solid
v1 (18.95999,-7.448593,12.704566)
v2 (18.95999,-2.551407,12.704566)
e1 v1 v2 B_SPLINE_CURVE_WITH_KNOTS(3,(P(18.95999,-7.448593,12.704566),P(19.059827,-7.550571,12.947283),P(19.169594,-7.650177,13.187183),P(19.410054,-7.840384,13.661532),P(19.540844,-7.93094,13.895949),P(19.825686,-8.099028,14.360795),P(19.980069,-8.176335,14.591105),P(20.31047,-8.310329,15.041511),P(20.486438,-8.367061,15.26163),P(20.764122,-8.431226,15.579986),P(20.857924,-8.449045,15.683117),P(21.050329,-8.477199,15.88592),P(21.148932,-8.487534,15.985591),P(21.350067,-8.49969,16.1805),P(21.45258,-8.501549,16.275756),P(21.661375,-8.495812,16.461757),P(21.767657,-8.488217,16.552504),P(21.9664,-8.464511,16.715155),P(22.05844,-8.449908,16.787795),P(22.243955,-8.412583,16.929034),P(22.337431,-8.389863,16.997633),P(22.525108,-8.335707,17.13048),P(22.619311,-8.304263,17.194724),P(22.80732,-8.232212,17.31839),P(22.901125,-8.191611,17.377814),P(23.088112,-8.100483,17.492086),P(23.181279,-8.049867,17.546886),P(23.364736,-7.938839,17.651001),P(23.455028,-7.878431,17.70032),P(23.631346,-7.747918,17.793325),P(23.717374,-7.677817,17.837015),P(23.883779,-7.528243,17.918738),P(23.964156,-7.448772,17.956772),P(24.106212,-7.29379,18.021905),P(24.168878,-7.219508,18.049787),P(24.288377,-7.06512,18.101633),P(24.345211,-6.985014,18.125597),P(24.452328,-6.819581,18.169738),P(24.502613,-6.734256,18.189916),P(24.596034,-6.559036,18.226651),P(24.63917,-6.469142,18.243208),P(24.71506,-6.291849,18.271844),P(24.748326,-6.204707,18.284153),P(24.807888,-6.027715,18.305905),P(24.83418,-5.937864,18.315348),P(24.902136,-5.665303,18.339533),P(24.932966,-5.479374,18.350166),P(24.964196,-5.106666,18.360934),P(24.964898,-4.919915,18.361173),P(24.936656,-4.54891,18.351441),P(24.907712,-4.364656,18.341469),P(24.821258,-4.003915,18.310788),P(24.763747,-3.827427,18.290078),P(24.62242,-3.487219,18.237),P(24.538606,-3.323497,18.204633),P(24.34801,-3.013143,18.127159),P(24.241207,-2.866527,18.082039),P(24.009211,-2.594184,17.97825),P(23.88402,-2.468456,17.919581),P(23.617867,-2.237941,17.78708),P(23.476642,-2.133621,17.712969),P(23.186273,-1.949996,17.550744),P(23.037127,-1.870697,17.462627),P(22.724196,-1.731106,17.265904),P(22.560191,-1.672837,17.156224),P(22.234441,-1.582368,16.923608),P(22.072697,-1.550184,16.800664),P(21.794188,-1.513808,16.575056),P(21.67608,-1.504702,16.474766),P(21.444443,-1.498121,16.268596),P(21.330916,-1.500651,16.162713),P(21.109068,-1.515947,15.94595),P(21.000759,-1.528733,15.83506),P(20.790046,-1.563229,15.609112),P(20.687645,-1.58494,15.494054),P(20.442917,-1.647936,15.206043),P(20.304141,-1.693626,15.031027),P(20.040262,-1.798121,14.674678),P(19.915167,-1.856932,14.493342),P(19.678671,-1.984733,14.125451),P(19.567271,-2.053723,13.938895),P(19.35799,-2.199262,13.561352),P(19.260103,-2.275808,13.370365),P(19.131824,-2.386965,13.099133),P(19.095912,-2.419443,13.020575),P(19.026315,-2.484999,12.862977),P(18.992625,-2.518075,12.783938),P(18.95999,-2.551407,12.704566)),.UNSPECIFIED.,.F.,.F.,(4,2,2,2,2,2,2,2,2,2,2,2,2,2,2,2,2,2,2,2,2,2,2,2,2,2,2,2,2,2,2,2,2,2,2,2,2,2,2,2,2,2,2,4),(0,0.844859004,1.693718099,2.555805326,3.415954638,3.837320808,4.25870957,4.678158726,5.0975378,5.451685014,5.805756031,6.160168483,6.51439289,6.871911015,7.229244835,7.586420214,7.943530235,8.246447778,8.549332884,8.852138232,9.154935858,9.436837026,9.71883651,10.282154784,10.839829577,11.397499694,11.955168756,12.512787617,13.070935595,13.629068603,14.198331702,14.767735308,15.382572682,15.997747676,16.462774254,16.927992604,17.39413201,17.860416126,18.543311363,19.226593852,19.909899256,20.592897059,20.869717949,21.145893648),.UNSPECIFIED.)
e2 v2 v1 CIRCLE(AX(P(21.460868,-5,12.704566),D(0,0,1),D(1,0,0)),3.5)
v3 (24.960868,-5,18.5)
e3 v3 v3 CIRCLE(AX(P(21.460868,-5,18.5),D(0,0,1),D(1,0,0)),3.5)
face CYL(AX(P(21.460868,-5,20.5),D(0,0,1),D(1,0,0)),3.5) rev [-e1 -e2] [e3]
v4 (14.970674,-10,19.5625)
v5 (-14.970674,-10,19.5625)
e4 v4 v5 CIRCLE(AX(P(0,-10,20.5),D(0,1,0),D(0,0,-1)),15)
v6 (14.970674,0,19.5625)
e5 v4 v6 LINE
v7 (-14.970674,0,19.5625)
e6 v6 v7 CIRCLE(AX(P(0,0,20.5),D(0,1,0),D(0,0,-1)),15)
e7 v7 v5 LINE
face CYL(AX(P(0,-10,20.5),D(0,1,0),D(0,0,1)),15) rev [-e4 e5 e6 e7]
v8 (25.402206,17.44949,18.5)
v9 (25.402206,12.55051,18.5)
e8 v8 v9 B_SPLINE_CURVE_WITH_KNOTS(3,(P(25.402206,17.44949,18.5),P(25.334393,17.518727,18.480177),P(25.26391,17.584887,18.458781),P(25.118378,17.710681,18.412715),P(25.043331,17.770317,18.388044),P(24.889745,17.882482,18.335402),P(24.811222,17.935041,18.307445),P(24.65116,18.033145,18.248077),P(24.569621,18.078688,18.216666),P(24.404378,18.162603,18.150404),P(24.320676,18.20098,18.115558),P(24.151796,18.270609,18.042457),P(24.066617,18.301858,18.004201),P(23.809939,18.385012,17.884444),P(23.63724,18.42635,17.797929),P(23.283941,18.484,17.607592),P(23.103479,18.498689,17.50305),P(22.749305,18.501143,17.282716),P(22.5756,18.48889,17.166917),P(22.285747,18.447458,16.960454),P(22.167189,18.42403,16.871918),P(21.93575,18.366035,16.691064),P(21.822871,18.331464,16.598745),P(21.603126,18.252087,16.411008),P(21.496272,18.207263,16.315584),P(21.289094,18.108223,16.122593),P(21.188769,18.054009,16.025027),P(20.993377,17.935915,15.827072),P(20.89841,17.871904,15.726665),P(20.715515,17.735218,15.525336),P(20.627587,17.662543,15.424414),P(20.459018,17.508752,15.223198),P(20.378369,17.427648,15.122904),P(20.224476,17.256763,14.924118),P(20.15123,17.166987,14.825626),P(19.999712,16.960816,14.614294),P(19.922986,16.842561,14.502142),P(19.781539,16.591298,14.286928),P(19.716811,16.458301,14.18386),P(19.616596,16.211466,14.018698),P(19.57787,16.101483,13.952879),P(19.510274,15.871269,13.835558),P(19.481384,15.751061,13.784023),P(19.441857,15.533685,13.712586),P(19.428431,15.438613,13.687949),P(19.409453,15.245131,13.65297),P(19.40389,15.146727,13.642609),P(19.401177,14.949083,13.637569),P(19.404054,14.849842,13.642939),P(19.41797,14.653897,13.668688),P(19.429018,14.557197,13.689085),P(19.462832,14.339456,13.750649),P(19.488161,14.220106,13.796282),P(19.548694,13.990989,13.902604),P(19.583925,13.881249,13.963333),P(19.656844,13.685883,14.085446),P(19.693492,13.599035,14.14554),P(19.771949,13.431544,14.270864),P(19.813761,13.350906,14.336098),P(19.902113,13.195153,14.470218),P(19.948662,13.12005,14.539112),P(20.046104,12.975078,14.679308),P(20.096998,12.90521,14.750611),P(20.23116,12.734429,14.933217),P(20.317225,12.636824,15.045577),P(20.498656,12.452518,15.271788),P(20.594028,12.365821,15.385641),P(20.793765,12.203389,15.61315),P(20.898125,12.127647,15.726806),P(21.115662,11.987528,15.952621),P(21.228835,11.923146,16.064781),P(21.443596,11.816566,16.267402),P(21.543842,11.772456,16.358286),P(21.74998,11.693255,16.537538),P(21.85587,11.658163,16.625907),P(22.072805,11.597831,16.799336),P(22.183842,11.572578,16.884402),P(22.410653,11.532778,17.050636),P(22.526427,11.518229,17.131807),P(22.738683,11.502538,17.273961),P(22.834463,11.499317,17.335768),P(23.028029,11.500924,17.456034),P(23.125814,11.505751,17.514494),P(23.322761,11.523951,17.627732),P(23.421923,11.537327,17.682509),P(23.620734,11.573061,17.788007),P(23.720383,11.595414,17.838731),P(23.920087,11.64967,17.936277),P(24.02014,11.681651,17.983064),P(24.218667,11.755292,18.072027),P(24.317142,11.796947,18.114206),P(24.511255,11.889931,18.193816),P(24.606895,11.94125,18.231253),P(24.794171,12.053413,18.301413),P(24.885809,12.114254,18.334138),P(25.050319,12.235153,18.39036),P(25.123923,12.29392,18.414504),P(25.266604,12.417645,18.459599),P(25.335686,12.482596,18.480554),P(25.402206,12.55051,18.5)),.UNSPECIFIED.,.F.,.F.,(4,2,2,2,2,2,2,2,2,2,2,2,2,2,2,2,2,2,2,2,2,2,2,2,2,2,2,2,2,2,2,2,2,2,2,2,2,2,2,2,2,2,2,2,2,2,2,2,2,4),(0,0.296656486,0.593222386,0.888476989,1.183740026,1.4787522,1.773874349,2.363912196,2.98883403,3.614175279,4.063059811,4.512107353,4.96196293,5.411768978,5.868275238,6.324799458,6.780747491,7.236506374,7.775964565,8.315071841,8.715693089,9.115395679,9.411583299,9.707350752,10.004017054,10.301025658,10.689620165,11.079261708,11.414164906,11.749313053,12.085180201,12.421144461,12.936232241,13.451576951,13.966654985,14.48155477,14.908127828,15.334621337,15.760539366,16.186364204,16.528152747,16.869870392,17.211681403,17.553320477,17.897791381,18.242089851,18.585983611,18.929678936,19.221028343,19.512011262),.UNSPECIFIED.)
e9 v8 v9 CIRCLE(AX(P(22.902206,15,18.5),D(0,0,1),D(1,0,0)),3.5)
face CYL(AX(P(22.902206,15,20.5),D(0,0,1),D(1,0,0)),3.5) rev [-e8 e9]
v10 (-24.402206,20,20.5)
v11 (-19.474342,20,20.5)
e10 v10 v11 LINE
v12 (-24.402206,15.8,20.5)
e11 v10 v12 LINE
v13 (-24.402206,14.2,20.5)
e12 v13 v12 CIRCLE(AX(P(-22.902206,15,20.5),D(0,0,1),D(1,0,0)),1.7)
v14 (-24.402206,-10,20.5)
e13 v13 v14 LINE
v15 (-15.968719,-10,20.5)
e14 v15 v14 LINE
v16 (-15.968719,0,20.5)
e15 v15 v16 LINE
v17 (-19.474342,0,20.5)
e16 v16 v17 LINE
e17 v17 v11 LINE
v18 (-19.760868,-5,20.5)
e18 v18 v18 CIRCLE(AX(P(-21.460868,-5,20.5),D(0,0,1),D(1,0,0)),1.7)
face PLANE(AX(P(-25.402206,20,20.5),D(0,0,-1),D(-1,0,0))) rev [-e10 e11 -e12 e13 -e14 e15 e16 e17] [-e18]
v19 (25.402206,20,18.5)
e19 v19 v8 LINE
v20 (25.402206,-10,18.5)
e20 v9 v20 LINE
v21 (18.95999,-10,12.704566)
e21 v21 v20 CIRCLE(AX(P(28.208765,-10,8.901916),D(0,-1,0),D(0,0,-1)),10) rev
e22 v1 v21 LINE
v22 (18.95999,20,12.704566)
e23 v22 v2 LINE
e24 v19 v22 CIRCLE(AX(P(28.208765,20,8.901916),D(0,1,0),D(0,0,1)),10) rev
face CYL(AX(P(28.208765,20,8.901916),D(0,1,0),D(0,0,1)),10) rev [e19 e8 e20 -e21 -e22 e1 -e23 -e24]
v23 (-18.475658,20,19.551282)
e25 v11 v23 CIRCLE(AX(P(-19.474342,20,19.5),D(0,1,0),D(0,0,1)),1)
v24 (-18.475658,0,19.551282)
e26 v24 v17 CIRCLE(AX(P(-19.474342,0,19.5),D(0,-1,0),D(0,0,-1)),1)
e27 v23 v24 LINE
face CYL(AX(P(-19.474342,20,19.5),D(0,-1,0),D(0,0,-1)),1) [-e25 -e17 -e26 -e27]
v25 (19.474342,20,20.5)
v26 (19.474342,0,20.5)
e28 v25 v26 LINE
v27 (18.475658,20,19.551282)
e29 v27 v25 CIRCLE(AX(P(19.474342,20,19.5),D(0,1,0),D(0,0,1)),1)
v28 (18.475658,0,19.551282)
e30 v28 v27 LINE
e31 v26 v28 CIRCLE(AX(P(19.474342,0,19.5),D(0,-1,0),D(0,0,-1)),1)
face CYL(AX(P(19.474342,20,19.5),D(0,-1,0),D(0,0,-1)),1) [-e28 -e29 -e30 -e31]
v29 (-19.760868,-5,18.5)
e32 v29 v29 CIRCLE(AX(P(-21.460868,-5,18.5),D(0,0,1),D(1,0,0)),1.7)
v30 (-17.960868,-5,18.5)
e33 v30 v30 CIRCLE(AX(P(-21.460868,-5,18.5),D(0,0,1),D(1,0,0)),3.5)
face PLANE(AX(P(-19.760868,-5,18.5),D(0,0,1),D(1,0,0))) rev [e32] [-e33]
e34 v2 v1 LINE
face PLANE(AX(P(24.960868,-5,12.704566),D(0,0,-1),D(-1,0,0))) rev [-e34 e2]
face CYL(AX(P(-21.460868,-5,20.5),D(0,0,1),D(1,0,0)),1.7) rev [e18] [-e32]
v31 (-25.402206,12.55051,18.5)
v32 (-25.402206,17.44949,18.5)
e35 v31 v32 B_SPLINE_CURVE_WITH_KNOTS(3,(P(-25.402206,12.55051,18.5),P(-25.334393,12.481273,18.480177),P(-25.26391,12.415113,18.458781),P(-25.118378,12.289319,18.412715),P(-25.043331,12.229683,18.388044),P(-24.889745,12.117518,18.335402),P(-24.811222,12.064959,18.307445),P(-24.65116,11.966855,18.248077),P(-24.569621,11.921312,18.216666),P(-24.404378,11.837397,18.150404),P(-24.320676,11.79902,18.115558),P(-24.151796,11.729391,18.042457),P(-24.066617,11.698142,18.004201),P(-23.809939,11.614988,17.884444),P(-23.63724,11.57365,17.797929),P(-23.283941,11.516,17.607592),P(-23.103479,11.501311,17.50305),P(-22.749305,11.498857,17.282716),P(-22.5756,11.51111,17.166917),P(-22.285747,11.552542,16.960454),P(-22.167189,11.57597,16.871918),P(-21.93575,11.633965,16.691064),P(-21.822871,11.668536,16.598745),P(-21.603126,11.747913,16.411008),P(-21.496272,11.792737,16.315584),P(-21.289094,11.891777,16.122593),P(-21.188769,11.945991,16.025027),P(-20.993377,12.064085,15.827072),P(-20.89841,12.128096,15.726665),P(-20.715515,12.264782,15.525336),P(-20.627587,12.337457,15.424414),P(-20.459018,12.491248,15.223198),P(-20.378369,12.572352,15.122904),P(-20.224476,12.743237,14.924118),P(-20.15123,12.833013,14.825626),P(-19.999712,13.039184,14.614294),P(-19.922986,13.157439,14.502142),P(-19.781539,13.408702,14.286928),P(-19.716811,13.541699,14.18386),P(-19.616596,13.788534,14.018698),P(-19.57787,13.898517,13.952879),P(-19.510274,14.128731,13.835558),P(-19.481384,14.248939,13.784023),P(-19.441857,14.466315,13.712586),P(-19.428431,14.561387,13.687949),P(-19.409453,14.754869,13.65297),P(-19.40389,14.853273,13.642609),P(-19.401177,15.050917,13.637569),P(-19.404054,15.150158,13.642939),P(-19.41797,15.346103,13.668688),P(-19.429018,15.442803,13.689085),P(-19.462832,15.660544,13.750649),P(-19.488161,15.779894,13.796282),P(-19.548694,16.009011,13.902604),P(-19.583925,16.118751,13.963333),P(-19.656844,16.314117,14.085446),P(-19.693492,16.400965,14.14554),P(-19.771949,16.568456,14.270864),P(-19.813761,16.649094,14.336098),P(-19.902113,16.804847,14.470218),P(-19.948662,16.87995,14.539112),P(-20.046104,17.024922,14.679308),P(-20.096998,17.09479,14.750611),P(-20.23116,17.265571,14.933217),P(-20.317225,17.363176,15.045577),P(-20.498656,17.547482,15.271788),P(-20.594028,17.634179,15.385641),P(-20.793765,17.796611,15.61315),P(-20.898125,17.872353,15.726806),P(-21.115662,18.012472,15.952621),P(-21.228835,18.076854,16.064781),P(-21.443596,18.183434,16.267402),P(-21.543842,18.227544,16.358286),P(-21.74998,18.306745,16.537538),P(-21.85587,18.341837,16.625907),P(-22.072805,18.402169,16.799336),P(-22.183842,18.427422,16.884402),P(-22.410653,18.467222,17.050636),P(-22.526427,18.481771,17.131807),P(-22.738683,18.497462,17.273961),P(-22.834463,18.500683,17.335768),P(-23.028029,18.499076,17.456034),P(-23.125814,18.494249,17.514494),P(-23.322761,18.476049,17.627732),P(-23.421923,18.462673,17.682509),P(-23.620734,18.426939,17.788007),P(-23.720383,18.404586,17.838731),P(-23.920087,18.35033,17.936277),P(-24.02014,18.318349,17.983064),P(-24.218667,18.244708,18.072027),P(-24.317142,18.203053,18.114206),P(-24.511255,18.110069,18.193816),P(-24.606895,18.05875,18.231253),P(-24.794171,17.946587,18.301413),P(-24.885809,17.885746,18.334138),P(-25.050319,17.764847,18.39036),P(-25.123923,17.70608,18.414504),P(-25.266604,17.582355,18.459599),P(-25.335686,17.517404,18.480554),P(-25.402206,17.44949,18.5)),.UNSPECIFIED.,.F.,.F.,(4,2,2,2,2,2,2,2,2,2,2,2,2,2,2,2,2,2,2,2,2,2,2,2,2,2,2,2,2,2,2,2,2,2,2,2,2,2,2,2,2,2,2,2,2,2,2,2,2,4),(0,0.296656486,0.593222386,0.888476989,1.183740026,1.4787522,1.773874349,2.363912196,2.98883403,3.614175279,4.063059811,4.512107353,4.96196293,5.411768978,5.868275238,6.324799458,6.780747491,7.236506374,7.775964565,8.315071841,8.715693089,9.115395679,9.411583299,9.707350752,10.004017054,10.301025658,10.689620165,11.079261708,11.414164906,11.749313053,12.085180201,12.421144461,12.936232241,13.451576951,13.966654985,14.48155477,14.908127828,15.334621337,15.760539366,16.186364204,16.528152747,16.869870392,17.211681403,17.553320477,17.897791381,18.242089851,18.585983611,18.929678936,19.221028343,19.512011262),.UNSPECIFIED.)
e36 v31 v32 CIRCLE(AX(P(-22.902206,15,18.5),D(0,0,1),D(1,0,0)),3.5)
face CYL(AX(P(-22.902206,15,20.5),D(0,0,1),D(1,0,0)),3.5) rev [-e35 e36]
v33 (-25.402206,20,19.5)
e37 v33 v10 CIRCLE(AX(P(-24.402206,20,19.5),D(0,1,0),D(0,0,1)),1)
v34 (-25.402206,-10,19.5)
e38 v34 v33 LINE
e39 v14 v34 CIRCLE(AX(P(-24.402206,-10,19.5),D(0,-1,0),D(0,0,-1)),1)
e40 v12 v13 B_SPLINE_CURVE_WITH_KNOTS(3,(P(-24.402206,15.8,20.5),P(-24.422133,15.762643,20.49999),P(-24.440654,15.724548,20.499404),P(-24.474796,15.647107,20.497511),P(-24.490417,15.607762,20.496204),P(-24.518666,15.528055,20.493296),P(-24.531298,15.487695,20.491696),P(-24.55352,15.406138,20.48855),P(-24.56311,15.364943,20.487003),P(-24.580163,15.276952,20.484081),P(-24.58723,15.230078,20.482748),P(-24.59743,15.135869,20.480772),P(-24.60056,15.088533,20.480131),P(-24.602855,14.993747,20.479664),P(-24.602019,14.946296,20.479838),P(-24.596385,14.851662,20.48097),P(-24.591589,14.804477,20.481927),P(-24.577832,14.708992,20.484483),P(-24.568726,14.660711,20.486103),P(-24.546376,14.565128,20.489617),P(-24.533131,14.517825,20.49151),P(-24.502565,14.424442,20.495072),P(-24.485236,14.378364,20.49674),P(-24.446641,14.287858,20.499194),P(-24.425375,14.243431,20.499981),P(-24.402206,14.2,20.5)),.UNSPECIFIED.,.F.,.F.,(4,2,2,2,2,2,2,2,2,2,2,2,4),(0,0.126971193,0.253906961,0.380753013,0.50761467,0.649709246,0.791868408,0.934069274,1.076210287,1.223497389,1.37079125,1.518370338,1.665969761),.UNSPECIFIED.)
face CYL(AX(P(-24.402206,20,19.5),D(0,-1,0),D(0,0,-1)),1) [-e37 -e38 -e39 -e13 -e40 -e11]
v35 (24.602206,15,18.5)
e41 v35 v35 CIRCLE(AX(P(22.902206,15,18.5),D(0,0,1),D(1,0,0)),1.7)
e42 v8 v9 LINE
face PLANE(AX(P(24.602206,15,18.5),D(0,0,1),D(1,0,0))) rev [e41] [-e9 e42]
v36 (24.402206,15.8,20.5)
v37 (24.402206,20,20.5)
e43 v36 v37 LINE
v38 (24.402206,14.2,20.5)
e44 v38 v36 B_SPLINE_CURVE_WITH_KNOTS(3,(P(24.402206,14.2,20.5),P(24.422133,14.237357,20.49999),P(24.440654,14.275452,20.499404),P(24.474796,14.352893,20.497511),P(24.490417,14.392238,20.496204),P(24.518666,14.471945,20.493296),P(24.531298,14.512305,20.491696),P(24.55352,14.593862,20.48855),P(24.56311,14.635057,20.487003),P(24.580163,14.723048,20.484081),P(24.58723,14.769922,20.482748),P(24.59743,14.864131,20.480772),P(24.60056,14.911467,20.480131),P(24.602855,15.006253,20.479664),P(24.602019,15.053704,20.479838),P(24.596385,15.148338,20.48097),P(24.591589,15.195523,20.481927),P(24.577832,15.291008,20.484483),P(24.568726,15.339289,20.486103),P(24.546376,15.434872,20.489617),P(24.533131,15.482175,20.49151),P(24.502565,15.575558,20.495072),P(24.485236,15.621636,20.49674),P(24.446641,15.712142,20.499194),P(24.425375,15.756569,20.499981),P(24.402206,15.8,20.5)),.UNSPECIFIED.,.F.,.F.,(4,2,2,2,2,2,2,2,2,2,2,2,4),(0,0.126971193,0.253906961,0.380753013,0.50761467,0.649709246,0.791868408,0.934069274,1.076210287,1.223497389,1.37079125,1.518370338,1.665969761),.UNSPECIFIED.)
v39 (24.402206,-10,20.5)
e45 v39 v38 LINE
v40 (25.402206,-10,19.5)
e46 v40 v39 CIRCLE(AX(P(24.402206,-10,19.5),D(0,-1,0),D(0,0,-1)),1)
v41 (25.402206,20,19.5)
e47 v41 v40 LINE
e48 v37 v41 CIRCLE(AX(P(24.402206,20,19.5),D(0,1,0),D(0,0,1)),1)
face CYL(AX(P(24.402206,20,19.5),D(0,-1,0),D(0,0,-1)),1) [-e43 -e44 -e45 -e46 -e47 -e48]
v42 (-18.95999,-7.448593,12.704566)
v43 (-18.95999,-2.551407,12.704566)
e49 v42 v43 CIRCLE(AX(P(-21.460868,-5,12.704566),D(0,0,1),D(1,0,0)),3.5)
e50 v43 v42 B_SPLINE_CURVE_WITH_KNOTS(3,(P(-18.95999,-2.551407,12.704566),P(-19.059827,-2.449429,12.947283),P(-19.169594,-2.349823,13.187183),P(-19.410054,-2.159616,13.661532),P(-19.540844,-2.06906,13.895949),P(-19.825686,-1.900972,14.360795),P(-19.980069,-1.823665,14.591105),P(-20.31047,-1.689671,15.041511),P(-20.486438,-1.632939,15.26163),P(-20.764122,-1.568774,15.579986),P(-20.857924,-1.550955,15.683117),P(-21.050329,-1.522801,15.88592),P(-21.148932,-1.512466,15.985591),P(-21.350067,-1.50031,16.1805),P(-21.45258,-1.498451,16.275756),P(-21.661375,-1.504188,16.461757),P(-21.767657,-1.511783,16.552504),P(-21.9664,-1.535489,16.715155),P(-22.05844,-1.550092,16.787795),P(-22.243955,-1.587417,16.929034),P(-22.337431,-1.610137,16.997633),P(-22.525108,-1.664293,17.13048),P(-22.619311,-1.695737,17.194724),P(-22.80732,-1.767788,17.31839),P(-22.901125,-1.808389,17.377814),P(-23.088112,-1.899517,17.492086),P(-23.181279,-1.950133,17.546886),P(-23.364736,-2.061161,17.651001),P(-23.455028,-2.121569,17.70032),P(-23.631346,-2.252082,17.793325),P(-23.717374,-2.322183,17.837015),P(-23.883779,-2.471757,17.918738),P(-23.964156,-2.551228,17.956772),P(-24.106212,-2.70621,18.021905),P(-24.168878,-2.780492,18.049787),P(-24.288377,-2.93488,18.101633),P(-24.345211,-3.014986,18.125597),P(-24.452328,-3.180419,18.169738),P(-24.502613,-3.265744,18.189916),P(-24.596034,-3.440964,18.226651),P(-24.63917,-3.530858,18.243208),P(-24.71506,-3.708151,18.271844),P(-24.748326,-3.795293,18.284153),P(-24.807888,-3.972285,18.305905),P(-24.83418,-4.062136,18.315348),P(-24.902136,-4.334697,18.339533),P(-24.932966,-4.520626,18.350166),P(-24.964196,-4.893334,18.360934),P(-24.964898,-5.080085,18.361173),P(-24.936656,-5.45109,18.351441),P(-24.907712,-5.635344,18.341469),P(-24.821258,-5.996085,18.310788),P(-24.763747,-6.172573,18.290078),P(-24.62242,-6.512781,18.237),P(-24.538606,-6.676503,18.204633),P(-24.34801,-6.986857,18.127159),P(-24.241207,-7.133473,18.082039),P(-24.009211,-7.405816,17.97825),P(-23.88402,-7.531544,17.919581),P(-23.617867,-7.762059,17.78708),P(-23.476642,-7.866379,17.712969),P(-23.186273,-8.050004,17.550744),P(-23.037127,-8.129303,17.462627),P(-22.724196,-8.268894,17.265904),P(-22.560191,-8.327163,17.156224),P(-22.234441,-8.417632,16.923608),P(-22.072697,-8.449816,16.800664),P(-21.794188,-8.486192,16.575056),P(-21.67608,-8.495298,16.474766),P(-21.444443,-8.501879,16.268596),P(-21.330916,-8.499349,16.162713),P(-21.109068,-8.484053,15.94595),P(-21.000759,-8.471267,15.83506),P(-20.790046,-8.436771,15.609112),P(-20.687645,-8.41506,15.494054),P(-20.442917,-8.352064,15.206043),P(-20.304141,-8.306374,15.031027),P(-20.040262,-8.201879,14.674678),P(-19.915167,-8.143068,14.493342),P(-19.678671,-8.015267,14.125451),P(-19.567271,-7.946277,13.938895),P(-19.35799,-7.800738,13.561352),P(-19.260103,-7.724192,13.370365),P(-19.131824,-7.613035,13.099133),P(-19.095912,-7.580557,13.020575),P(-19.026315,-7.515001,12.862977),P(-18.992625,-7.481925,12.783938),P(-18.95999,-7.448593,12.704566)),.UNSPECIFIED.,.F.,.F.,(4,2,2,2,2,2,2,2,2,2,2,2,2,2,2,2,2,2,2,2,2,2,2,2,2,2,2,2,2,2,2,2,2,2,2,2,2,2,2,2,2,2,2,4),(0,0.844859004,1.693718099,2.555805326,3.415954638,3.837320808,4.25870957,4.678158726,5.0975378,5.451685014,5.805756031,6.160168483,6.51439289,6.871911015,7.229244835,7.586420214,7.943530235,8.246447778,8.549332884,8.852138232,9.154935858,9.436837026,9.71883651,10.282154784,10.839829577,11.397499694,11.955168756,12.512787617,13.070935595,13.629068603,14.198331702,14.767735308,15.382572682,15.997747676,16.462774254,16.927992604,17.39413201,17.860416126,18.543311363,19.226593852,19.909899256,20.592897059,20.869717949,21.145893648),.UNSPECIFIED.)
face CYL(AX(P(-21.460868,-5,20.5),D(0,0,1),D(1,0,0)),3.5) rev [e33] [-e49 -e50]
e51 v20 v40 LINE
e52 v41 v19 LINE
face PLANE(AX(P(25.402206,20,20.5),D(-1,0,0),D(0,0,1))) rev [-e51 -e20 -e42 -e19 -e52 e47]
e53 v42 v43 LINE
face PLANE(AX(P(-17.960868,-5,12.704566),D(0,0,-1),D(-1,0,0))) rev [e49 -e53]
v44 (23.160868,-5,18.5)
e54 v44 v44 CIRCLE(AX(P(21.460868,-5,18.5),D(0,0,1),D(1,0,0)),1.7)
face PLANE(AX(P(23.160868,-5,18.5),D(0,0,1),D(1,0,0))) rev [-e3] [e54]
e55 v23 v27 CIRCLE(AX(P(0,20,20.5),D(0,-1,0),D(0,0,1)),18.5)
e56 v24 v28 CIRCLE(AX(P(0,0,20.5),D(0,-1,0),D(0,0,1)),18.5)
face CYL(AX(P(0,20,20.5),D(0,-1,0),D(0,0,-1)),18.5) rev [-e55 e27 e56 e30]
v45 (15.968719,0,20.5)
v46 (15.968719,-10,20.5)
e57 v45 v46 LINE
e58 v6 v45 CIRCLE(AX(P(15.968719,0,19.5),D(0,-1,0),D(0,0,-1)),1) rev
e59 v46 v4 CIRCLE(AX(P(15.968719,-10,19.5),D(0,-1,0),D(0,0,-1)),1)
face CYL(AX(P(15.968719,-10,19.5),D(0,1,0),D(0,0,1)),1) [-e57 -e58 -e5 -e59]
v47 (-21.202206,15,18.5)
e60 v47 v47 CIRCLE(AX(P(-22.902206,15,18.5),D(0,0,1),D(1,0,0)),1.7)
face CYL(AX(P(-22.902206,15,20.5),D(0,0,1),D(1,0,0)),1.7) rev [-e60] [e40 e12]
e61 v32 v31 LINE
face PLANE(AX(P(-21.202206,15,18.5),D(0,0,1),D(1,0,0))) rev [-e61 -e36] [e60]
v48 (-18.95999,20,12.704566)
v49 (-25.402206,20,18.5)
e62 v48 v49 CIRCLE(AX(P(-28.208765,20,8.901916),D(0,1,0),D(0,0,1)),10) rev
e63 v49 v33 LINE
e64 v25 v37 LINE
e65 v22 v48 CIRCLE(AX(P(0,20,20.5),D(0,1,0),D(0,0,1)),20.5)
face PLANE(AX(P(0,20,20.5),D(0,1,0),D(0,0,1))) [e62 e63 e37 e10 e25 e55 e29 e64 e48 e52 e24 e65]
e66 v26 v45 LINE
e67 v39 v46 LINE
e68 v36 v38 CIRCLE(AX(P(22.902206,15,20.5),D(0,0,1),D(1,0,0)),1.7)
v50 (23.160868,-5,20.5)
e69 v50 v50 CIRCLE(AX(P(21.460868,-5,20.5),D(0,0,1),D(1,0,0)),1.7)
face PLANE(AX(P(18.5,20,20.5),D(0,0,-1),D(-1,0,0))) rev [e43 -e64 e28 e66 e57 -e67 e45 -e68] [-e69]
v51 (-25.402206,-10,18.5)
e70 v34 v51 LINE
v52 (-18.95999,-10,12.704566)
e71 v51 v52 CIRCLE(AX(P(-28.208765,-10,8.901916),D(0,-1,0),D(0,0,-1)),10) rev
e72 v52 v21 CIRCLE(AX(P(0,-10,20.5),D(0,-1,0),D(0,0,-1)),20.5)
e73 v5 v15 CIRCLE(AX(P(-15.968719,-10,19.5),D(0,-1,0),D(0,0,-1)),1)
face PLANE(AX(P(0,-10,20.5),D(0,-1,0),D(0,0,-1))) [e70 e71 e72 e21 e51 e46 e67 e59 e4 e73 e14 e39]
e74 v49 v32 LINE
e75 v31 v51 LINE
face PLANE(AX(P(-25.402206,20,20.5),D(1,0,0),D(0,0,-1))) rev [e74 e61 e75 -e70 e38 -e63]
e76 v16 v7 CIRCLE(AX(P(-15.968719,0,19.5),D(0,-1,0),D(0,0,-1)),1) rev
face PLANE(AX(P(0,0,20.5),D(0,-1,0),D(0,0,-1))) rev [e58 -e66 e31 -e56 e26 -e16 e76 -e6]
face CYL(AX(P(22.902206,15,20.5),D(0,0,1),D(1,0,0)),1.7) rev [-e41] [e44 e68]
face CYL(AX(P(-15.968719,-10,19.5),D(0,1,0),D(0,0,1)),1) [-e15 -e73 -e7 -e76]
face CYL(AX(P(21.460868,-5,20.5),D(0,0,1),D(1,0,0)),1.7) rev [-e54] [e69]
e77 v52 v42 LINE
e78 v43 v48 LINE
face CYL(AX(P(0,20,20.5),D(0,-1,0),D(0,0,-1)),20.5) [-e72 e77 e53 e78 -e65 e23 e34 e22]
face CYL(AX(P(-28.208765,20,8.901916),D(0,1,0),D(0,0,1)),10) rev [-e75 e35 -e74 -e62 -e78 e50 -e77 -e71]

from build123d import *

# Parameters (mm, degrees)
BOSS_EXTRU_1_DEPTH         = 20
BOSS_EXTRU_2_START         = 10
BOSS_EXTRU_2_DEPTH         = 10
CONG_4_R                   = 10
PER_AGEAVANC_1_START       = 12.70456624
PER_AGEAVANC_1_OUTLINE_R   = 3.5
PER_AGEAVANC_1_DEPTH       = 5.79543376
PER_AGEAVANC_1_START_2     = 18.5
PER_AGEAVANC_1_2_OUTLINE_R = 1.7
PER_AGEAVANC_1_2_DEPTH     = 2
CONG_6_R                   = 1


# Read off the part's stored shape, not the designer's step: PerçageAvancé1
with BuildPart() as part:
    # Esquisse4 → Boss.-Extru.1 (new body)
    with BuildSketch(Plane(origin=(0, 0, 0), x_dir=(1, 0, 0), z_dir=(0, 1, 0))):
        with BuildLine():
            Line((-25.402205763, -20.5), (-25.402205763, -18.5))
            Line((-25.402205763, -18.5), (-20.402205763, -18.5))
            ThreePointArc((-20.402205763, -18.5), (0, 0), (20.402205763, -18.5))
            Line((20.402205763, -18.5), (25.402205763, -18.5))
            Line((25.402205763, -18.5), (25.402205763, -20.5))
            Line((25.402205763, -20.5), (18.5, -20.5))
            ThreePointArc((18.5, -20.5), (0, -2), (-18.5, -20.5))
            Line((-18.5, -20.5), (-25.402205763, -20.5))
        make_face()
    extrude(amount=BOSS_EXTRU_1_DEPTH)

    # Esquisse8 → Boss.-Extru.2 (add)
    with BuildSketch(Plane.XZ.offset(BOSS_EXTRU_2_START)):
        with BuildLine():
            Line((-25.402205763, 20.5), (-15, 20.5))
            ThreePointArc((-15, 20.5), (0, 5.5), (15, 20.5))
            Line((15, 20.5), (25.402205763, 20.5))
            Line((25.402205763, 20.5), (25.402205763, 18.5))
            Line((25.402205763, 18.5), (20.402205763, 18.5))
            ThreePointArc((20.402205763, 18.5), (0, 0), (-20.402205763, 18.5))
            Line((-20.402205763, 18.5), (-25.402205763, 18.5))
            Line((-25.402205763, 18.5), (-25.402205763, 20.5))
        make_face()
    extrude(amount=-BOSS_EXTRU_2_DEPTH)

    # Congé4
    # the kernel refuses this fillet: 10 mm, written as the material it adds along each edge
    with BuildSketch(Plane(origin=(20.402205763, 20, 18.5), x_dir=(1, 0, 0), z_dir=(0, -1, 0))) as cong_4_piece_1:
        with BuildLine():
            CenterArc((7.806559521, -9.598084374), CONG_4_R, 106.29935787, 51.350539993)
            Line((-1.442215982, -5.79543376), (-1.627191492, -5.719380747))
            ThreePointArc((-1.627191492, -5.719380747), (-0.703011933, -2.902220154), (-0.19904591, 0.019512195))
            Line((-0.19904591, 0.019512195), (0, 0.2))
            ThreePointArc((0, 0.2), (2.5, 0.2), (4.94386881, 0.191961687))
            Line((4.94386881, 0.191961687), (5, 0))
        make_face()
    extrude(amount=30)
    with BuildSketch(Plane(origin=(-20.402205763, 20, 18.5), x_dir=(0.241488677516522, 0, -0.9704036369631562), z_dir=(0, -1, 0))) as cong_4_piece_2:
        with BuildLine():
            CenterArc((7.42882025, -9.893342453), CONG_4_R, 98.375682161, 51.350539993)
            Line((-1.207443388, -4.852018185), (-1.38016866, -4.751191699))
            ThreePointArc((-1.38016866, -4.751191699), (-0.797802421, -2.377711357), (-0.194080727, 0.048297736))
            Line((-0.194080727, 0.048297736), (0.029132628, 0.197866849))
            ThreePointArc((0.029132628, 0.197866849), (2.986094414, -0.01864797), (5.9430562, 0.197866849))
            Line((5.9430562, 0.197866849), (5.972188828, 0))
        make_face()
    extrude(amount=30)

    # PerçageAvancé1 outline → PerçageAvancé1 (cut)
    with BuildSketch(Plane.XY.offset(PER_AGEAVANC_1_START)):
        with BuildLine():
            Line((27, 15.818747829), (25.402205763, 17.449489743))
            ThreePointArc((25.402205763, 17.449489743), (19.402205763, 15), (25.402205763, 12.550510257))
            Line((25.402205763, 12.550510257), (27, 14.181252171))
            Line((27, 14.181252171), (27, 15.818747829))
        make_face()
        with BuildLine():
            Line((-25.402205763, 17.449489743), (-27, 15.818747829))
            Line((-27, 15.818747829), (-27, 14.181252171))
            Line((-27, 14.181252171), (-25.402205763, 12.550510257))
            ThreePointArc((-25.402205763, 12.550510257), (-19.402205763, 15), (-25.402205763, 17.449489743))
        make_face()
        with Locations((21.460868066, -5)):
            Circle(PER_AGEAVANC_1_OUTLINE_R)
        with Locations((-21.460868066, -5)):
            Circle(PER_AGEAVANC_1_OUTLINE_R)
    extrude(amount=PER_AGEAVANC_1_DEPTH, mode=Mode.SUBTRACT)

    # Per_ageAvanc_1 2 outline → Per_ageAvanc_1 2 (cut)
    with BuildSketch(Plane.XY.offset(PER_AGEAVANC_1_START_2)):
        with Locations((22.902205763, 15)):
            Circle(PER_AGEAVANC_1_2_OUTLINE_R)
        with Locations((21.460868066, -5)):
            Circle(PER_AGEAVANC_1_2_OUTLINE_R)
        with Locations((-21.460868066, -5)):
            Circle(PER_AGEAVANC_1_2_OUTLINE_R)
        with Locations((-22.902205763, 15)):
            Circle(PER_AGEAVANC_1_2_OUTLINE_R)
    extrude(amount=PER_AGEAVANC_1_2_DEPTH, mode=Mode.SUBTRACT)

    # Congé6
    # the kernel refuses this fillet: 1 mm, written as the material it takes off along each edge
    with BuildSketch(Plane(origin=(25.402205763, -12.5, 20.5), x_dir=(-1, 0, 0), z_dir=(0, 1, 0))) as cong_6_piece_1:
        with BuildLine():
            CenterArc((CONG_6_R, -CONG_6_R), CONG_6_R, 90, 90)
            Line((0, -CONG_6_R), (0, 0))
            Line((0, 0), (CONG_6_R, 0))
        make_face()
    extrude(amount=35, mode=Mode.SUBTRACT)
    with BuildSketch(Plane(origin=(18.5, 0, 20.5), x_dir=(-0.02564946435665691, 0, -0.9996709983680714), z_dir=(0, 1, 0))) as cong_6_piece_2:
        with BuildLine():
            CenterArc((0.974679646, -0.999670998), CONG_6_R, 91.469767243, 87.060465514)
            Line((-0.024991353, -0.974021534), (0, 0))
            ThreePointArc((0, 0), (0.474515091, -0.00608653), (0.949030181, 0))
        make_face()
    extrude(amount=22.435855235, mode=Mode.SUBTRACT)
    with BuildSketch(Plane(origin=(-18.5, 0, 20.5), x_dir=(-1, 0, 0), z_dir=(0, 1, 0))) as cong_6_piece_3:
        with BuildLine():
            CenterArc((0.974342094, -1), CONG_6_R, 90, 87.060465514)
            ThreePointArc((-0.024342116, -0.948717949), (-0.00608653, -0.474515091), (0, 0))
            Line((0, 0), (0.974342094, 0))
        make_face()
    extrude(amount=22.435855235, mode=Mode.SUBTRACT)
    with BuildSketch(Plane(origin=(-25.402205763, 22.5, 20.5), x_dir=(0, 0, -1), z_dir=(0, -1, 0))) as cong_6_piece_4:
        with BuildLine():
            CenterArc((CONG_6_R, CONG_6_R), CONG_6_R, 180, 90)
            Line((0, CONG_6_R), (0, 0))
            Line((0, 0), (CONG_6_R, 0))
        make_face()
    extrude(amount=35, mode=Mode.SUBTRACT)
    with BuildSketch(Plane(origin=(15, -12.421798557, 20.5), x_dir=(1, 0, 0), z_dir=(0, 1, 0))) as cong_6_piece_5:
        with BuildLine():
            CenterArc((0.968719423, 1), CONG_6_R, 183.583321698, 86.416678302)
            ThreePointArc((-0.029325541, 0.9375), (-0.007333178, 0.468979274), (0, 0))
            Line((0, 0), (0.968719423, 0))
        make_face()
    extrude(amount=14.843597113, mode=Mode.SUBTRACT)
    with BuildSketch(Plane(origin=(-15, -12.421798557, 20.5), x_dir=(-1, 0, 0), z_dir=(0, 1, 0))) as cong_6_piece_6:
        with BuildLine():
            CenterArc((0.968719423, -1), CONG_6_R, 90, 86.416678302)
            ThreePointArc((-0.029325541, -0.9375), (-0.007333178, -0.468979274), (0, 0))
            Line((0, 0), (0.968719423, 0))
        make_face()
    extrude(amount=14.843597113, mode=Mode.SUBTRACT)


solid = part.part
